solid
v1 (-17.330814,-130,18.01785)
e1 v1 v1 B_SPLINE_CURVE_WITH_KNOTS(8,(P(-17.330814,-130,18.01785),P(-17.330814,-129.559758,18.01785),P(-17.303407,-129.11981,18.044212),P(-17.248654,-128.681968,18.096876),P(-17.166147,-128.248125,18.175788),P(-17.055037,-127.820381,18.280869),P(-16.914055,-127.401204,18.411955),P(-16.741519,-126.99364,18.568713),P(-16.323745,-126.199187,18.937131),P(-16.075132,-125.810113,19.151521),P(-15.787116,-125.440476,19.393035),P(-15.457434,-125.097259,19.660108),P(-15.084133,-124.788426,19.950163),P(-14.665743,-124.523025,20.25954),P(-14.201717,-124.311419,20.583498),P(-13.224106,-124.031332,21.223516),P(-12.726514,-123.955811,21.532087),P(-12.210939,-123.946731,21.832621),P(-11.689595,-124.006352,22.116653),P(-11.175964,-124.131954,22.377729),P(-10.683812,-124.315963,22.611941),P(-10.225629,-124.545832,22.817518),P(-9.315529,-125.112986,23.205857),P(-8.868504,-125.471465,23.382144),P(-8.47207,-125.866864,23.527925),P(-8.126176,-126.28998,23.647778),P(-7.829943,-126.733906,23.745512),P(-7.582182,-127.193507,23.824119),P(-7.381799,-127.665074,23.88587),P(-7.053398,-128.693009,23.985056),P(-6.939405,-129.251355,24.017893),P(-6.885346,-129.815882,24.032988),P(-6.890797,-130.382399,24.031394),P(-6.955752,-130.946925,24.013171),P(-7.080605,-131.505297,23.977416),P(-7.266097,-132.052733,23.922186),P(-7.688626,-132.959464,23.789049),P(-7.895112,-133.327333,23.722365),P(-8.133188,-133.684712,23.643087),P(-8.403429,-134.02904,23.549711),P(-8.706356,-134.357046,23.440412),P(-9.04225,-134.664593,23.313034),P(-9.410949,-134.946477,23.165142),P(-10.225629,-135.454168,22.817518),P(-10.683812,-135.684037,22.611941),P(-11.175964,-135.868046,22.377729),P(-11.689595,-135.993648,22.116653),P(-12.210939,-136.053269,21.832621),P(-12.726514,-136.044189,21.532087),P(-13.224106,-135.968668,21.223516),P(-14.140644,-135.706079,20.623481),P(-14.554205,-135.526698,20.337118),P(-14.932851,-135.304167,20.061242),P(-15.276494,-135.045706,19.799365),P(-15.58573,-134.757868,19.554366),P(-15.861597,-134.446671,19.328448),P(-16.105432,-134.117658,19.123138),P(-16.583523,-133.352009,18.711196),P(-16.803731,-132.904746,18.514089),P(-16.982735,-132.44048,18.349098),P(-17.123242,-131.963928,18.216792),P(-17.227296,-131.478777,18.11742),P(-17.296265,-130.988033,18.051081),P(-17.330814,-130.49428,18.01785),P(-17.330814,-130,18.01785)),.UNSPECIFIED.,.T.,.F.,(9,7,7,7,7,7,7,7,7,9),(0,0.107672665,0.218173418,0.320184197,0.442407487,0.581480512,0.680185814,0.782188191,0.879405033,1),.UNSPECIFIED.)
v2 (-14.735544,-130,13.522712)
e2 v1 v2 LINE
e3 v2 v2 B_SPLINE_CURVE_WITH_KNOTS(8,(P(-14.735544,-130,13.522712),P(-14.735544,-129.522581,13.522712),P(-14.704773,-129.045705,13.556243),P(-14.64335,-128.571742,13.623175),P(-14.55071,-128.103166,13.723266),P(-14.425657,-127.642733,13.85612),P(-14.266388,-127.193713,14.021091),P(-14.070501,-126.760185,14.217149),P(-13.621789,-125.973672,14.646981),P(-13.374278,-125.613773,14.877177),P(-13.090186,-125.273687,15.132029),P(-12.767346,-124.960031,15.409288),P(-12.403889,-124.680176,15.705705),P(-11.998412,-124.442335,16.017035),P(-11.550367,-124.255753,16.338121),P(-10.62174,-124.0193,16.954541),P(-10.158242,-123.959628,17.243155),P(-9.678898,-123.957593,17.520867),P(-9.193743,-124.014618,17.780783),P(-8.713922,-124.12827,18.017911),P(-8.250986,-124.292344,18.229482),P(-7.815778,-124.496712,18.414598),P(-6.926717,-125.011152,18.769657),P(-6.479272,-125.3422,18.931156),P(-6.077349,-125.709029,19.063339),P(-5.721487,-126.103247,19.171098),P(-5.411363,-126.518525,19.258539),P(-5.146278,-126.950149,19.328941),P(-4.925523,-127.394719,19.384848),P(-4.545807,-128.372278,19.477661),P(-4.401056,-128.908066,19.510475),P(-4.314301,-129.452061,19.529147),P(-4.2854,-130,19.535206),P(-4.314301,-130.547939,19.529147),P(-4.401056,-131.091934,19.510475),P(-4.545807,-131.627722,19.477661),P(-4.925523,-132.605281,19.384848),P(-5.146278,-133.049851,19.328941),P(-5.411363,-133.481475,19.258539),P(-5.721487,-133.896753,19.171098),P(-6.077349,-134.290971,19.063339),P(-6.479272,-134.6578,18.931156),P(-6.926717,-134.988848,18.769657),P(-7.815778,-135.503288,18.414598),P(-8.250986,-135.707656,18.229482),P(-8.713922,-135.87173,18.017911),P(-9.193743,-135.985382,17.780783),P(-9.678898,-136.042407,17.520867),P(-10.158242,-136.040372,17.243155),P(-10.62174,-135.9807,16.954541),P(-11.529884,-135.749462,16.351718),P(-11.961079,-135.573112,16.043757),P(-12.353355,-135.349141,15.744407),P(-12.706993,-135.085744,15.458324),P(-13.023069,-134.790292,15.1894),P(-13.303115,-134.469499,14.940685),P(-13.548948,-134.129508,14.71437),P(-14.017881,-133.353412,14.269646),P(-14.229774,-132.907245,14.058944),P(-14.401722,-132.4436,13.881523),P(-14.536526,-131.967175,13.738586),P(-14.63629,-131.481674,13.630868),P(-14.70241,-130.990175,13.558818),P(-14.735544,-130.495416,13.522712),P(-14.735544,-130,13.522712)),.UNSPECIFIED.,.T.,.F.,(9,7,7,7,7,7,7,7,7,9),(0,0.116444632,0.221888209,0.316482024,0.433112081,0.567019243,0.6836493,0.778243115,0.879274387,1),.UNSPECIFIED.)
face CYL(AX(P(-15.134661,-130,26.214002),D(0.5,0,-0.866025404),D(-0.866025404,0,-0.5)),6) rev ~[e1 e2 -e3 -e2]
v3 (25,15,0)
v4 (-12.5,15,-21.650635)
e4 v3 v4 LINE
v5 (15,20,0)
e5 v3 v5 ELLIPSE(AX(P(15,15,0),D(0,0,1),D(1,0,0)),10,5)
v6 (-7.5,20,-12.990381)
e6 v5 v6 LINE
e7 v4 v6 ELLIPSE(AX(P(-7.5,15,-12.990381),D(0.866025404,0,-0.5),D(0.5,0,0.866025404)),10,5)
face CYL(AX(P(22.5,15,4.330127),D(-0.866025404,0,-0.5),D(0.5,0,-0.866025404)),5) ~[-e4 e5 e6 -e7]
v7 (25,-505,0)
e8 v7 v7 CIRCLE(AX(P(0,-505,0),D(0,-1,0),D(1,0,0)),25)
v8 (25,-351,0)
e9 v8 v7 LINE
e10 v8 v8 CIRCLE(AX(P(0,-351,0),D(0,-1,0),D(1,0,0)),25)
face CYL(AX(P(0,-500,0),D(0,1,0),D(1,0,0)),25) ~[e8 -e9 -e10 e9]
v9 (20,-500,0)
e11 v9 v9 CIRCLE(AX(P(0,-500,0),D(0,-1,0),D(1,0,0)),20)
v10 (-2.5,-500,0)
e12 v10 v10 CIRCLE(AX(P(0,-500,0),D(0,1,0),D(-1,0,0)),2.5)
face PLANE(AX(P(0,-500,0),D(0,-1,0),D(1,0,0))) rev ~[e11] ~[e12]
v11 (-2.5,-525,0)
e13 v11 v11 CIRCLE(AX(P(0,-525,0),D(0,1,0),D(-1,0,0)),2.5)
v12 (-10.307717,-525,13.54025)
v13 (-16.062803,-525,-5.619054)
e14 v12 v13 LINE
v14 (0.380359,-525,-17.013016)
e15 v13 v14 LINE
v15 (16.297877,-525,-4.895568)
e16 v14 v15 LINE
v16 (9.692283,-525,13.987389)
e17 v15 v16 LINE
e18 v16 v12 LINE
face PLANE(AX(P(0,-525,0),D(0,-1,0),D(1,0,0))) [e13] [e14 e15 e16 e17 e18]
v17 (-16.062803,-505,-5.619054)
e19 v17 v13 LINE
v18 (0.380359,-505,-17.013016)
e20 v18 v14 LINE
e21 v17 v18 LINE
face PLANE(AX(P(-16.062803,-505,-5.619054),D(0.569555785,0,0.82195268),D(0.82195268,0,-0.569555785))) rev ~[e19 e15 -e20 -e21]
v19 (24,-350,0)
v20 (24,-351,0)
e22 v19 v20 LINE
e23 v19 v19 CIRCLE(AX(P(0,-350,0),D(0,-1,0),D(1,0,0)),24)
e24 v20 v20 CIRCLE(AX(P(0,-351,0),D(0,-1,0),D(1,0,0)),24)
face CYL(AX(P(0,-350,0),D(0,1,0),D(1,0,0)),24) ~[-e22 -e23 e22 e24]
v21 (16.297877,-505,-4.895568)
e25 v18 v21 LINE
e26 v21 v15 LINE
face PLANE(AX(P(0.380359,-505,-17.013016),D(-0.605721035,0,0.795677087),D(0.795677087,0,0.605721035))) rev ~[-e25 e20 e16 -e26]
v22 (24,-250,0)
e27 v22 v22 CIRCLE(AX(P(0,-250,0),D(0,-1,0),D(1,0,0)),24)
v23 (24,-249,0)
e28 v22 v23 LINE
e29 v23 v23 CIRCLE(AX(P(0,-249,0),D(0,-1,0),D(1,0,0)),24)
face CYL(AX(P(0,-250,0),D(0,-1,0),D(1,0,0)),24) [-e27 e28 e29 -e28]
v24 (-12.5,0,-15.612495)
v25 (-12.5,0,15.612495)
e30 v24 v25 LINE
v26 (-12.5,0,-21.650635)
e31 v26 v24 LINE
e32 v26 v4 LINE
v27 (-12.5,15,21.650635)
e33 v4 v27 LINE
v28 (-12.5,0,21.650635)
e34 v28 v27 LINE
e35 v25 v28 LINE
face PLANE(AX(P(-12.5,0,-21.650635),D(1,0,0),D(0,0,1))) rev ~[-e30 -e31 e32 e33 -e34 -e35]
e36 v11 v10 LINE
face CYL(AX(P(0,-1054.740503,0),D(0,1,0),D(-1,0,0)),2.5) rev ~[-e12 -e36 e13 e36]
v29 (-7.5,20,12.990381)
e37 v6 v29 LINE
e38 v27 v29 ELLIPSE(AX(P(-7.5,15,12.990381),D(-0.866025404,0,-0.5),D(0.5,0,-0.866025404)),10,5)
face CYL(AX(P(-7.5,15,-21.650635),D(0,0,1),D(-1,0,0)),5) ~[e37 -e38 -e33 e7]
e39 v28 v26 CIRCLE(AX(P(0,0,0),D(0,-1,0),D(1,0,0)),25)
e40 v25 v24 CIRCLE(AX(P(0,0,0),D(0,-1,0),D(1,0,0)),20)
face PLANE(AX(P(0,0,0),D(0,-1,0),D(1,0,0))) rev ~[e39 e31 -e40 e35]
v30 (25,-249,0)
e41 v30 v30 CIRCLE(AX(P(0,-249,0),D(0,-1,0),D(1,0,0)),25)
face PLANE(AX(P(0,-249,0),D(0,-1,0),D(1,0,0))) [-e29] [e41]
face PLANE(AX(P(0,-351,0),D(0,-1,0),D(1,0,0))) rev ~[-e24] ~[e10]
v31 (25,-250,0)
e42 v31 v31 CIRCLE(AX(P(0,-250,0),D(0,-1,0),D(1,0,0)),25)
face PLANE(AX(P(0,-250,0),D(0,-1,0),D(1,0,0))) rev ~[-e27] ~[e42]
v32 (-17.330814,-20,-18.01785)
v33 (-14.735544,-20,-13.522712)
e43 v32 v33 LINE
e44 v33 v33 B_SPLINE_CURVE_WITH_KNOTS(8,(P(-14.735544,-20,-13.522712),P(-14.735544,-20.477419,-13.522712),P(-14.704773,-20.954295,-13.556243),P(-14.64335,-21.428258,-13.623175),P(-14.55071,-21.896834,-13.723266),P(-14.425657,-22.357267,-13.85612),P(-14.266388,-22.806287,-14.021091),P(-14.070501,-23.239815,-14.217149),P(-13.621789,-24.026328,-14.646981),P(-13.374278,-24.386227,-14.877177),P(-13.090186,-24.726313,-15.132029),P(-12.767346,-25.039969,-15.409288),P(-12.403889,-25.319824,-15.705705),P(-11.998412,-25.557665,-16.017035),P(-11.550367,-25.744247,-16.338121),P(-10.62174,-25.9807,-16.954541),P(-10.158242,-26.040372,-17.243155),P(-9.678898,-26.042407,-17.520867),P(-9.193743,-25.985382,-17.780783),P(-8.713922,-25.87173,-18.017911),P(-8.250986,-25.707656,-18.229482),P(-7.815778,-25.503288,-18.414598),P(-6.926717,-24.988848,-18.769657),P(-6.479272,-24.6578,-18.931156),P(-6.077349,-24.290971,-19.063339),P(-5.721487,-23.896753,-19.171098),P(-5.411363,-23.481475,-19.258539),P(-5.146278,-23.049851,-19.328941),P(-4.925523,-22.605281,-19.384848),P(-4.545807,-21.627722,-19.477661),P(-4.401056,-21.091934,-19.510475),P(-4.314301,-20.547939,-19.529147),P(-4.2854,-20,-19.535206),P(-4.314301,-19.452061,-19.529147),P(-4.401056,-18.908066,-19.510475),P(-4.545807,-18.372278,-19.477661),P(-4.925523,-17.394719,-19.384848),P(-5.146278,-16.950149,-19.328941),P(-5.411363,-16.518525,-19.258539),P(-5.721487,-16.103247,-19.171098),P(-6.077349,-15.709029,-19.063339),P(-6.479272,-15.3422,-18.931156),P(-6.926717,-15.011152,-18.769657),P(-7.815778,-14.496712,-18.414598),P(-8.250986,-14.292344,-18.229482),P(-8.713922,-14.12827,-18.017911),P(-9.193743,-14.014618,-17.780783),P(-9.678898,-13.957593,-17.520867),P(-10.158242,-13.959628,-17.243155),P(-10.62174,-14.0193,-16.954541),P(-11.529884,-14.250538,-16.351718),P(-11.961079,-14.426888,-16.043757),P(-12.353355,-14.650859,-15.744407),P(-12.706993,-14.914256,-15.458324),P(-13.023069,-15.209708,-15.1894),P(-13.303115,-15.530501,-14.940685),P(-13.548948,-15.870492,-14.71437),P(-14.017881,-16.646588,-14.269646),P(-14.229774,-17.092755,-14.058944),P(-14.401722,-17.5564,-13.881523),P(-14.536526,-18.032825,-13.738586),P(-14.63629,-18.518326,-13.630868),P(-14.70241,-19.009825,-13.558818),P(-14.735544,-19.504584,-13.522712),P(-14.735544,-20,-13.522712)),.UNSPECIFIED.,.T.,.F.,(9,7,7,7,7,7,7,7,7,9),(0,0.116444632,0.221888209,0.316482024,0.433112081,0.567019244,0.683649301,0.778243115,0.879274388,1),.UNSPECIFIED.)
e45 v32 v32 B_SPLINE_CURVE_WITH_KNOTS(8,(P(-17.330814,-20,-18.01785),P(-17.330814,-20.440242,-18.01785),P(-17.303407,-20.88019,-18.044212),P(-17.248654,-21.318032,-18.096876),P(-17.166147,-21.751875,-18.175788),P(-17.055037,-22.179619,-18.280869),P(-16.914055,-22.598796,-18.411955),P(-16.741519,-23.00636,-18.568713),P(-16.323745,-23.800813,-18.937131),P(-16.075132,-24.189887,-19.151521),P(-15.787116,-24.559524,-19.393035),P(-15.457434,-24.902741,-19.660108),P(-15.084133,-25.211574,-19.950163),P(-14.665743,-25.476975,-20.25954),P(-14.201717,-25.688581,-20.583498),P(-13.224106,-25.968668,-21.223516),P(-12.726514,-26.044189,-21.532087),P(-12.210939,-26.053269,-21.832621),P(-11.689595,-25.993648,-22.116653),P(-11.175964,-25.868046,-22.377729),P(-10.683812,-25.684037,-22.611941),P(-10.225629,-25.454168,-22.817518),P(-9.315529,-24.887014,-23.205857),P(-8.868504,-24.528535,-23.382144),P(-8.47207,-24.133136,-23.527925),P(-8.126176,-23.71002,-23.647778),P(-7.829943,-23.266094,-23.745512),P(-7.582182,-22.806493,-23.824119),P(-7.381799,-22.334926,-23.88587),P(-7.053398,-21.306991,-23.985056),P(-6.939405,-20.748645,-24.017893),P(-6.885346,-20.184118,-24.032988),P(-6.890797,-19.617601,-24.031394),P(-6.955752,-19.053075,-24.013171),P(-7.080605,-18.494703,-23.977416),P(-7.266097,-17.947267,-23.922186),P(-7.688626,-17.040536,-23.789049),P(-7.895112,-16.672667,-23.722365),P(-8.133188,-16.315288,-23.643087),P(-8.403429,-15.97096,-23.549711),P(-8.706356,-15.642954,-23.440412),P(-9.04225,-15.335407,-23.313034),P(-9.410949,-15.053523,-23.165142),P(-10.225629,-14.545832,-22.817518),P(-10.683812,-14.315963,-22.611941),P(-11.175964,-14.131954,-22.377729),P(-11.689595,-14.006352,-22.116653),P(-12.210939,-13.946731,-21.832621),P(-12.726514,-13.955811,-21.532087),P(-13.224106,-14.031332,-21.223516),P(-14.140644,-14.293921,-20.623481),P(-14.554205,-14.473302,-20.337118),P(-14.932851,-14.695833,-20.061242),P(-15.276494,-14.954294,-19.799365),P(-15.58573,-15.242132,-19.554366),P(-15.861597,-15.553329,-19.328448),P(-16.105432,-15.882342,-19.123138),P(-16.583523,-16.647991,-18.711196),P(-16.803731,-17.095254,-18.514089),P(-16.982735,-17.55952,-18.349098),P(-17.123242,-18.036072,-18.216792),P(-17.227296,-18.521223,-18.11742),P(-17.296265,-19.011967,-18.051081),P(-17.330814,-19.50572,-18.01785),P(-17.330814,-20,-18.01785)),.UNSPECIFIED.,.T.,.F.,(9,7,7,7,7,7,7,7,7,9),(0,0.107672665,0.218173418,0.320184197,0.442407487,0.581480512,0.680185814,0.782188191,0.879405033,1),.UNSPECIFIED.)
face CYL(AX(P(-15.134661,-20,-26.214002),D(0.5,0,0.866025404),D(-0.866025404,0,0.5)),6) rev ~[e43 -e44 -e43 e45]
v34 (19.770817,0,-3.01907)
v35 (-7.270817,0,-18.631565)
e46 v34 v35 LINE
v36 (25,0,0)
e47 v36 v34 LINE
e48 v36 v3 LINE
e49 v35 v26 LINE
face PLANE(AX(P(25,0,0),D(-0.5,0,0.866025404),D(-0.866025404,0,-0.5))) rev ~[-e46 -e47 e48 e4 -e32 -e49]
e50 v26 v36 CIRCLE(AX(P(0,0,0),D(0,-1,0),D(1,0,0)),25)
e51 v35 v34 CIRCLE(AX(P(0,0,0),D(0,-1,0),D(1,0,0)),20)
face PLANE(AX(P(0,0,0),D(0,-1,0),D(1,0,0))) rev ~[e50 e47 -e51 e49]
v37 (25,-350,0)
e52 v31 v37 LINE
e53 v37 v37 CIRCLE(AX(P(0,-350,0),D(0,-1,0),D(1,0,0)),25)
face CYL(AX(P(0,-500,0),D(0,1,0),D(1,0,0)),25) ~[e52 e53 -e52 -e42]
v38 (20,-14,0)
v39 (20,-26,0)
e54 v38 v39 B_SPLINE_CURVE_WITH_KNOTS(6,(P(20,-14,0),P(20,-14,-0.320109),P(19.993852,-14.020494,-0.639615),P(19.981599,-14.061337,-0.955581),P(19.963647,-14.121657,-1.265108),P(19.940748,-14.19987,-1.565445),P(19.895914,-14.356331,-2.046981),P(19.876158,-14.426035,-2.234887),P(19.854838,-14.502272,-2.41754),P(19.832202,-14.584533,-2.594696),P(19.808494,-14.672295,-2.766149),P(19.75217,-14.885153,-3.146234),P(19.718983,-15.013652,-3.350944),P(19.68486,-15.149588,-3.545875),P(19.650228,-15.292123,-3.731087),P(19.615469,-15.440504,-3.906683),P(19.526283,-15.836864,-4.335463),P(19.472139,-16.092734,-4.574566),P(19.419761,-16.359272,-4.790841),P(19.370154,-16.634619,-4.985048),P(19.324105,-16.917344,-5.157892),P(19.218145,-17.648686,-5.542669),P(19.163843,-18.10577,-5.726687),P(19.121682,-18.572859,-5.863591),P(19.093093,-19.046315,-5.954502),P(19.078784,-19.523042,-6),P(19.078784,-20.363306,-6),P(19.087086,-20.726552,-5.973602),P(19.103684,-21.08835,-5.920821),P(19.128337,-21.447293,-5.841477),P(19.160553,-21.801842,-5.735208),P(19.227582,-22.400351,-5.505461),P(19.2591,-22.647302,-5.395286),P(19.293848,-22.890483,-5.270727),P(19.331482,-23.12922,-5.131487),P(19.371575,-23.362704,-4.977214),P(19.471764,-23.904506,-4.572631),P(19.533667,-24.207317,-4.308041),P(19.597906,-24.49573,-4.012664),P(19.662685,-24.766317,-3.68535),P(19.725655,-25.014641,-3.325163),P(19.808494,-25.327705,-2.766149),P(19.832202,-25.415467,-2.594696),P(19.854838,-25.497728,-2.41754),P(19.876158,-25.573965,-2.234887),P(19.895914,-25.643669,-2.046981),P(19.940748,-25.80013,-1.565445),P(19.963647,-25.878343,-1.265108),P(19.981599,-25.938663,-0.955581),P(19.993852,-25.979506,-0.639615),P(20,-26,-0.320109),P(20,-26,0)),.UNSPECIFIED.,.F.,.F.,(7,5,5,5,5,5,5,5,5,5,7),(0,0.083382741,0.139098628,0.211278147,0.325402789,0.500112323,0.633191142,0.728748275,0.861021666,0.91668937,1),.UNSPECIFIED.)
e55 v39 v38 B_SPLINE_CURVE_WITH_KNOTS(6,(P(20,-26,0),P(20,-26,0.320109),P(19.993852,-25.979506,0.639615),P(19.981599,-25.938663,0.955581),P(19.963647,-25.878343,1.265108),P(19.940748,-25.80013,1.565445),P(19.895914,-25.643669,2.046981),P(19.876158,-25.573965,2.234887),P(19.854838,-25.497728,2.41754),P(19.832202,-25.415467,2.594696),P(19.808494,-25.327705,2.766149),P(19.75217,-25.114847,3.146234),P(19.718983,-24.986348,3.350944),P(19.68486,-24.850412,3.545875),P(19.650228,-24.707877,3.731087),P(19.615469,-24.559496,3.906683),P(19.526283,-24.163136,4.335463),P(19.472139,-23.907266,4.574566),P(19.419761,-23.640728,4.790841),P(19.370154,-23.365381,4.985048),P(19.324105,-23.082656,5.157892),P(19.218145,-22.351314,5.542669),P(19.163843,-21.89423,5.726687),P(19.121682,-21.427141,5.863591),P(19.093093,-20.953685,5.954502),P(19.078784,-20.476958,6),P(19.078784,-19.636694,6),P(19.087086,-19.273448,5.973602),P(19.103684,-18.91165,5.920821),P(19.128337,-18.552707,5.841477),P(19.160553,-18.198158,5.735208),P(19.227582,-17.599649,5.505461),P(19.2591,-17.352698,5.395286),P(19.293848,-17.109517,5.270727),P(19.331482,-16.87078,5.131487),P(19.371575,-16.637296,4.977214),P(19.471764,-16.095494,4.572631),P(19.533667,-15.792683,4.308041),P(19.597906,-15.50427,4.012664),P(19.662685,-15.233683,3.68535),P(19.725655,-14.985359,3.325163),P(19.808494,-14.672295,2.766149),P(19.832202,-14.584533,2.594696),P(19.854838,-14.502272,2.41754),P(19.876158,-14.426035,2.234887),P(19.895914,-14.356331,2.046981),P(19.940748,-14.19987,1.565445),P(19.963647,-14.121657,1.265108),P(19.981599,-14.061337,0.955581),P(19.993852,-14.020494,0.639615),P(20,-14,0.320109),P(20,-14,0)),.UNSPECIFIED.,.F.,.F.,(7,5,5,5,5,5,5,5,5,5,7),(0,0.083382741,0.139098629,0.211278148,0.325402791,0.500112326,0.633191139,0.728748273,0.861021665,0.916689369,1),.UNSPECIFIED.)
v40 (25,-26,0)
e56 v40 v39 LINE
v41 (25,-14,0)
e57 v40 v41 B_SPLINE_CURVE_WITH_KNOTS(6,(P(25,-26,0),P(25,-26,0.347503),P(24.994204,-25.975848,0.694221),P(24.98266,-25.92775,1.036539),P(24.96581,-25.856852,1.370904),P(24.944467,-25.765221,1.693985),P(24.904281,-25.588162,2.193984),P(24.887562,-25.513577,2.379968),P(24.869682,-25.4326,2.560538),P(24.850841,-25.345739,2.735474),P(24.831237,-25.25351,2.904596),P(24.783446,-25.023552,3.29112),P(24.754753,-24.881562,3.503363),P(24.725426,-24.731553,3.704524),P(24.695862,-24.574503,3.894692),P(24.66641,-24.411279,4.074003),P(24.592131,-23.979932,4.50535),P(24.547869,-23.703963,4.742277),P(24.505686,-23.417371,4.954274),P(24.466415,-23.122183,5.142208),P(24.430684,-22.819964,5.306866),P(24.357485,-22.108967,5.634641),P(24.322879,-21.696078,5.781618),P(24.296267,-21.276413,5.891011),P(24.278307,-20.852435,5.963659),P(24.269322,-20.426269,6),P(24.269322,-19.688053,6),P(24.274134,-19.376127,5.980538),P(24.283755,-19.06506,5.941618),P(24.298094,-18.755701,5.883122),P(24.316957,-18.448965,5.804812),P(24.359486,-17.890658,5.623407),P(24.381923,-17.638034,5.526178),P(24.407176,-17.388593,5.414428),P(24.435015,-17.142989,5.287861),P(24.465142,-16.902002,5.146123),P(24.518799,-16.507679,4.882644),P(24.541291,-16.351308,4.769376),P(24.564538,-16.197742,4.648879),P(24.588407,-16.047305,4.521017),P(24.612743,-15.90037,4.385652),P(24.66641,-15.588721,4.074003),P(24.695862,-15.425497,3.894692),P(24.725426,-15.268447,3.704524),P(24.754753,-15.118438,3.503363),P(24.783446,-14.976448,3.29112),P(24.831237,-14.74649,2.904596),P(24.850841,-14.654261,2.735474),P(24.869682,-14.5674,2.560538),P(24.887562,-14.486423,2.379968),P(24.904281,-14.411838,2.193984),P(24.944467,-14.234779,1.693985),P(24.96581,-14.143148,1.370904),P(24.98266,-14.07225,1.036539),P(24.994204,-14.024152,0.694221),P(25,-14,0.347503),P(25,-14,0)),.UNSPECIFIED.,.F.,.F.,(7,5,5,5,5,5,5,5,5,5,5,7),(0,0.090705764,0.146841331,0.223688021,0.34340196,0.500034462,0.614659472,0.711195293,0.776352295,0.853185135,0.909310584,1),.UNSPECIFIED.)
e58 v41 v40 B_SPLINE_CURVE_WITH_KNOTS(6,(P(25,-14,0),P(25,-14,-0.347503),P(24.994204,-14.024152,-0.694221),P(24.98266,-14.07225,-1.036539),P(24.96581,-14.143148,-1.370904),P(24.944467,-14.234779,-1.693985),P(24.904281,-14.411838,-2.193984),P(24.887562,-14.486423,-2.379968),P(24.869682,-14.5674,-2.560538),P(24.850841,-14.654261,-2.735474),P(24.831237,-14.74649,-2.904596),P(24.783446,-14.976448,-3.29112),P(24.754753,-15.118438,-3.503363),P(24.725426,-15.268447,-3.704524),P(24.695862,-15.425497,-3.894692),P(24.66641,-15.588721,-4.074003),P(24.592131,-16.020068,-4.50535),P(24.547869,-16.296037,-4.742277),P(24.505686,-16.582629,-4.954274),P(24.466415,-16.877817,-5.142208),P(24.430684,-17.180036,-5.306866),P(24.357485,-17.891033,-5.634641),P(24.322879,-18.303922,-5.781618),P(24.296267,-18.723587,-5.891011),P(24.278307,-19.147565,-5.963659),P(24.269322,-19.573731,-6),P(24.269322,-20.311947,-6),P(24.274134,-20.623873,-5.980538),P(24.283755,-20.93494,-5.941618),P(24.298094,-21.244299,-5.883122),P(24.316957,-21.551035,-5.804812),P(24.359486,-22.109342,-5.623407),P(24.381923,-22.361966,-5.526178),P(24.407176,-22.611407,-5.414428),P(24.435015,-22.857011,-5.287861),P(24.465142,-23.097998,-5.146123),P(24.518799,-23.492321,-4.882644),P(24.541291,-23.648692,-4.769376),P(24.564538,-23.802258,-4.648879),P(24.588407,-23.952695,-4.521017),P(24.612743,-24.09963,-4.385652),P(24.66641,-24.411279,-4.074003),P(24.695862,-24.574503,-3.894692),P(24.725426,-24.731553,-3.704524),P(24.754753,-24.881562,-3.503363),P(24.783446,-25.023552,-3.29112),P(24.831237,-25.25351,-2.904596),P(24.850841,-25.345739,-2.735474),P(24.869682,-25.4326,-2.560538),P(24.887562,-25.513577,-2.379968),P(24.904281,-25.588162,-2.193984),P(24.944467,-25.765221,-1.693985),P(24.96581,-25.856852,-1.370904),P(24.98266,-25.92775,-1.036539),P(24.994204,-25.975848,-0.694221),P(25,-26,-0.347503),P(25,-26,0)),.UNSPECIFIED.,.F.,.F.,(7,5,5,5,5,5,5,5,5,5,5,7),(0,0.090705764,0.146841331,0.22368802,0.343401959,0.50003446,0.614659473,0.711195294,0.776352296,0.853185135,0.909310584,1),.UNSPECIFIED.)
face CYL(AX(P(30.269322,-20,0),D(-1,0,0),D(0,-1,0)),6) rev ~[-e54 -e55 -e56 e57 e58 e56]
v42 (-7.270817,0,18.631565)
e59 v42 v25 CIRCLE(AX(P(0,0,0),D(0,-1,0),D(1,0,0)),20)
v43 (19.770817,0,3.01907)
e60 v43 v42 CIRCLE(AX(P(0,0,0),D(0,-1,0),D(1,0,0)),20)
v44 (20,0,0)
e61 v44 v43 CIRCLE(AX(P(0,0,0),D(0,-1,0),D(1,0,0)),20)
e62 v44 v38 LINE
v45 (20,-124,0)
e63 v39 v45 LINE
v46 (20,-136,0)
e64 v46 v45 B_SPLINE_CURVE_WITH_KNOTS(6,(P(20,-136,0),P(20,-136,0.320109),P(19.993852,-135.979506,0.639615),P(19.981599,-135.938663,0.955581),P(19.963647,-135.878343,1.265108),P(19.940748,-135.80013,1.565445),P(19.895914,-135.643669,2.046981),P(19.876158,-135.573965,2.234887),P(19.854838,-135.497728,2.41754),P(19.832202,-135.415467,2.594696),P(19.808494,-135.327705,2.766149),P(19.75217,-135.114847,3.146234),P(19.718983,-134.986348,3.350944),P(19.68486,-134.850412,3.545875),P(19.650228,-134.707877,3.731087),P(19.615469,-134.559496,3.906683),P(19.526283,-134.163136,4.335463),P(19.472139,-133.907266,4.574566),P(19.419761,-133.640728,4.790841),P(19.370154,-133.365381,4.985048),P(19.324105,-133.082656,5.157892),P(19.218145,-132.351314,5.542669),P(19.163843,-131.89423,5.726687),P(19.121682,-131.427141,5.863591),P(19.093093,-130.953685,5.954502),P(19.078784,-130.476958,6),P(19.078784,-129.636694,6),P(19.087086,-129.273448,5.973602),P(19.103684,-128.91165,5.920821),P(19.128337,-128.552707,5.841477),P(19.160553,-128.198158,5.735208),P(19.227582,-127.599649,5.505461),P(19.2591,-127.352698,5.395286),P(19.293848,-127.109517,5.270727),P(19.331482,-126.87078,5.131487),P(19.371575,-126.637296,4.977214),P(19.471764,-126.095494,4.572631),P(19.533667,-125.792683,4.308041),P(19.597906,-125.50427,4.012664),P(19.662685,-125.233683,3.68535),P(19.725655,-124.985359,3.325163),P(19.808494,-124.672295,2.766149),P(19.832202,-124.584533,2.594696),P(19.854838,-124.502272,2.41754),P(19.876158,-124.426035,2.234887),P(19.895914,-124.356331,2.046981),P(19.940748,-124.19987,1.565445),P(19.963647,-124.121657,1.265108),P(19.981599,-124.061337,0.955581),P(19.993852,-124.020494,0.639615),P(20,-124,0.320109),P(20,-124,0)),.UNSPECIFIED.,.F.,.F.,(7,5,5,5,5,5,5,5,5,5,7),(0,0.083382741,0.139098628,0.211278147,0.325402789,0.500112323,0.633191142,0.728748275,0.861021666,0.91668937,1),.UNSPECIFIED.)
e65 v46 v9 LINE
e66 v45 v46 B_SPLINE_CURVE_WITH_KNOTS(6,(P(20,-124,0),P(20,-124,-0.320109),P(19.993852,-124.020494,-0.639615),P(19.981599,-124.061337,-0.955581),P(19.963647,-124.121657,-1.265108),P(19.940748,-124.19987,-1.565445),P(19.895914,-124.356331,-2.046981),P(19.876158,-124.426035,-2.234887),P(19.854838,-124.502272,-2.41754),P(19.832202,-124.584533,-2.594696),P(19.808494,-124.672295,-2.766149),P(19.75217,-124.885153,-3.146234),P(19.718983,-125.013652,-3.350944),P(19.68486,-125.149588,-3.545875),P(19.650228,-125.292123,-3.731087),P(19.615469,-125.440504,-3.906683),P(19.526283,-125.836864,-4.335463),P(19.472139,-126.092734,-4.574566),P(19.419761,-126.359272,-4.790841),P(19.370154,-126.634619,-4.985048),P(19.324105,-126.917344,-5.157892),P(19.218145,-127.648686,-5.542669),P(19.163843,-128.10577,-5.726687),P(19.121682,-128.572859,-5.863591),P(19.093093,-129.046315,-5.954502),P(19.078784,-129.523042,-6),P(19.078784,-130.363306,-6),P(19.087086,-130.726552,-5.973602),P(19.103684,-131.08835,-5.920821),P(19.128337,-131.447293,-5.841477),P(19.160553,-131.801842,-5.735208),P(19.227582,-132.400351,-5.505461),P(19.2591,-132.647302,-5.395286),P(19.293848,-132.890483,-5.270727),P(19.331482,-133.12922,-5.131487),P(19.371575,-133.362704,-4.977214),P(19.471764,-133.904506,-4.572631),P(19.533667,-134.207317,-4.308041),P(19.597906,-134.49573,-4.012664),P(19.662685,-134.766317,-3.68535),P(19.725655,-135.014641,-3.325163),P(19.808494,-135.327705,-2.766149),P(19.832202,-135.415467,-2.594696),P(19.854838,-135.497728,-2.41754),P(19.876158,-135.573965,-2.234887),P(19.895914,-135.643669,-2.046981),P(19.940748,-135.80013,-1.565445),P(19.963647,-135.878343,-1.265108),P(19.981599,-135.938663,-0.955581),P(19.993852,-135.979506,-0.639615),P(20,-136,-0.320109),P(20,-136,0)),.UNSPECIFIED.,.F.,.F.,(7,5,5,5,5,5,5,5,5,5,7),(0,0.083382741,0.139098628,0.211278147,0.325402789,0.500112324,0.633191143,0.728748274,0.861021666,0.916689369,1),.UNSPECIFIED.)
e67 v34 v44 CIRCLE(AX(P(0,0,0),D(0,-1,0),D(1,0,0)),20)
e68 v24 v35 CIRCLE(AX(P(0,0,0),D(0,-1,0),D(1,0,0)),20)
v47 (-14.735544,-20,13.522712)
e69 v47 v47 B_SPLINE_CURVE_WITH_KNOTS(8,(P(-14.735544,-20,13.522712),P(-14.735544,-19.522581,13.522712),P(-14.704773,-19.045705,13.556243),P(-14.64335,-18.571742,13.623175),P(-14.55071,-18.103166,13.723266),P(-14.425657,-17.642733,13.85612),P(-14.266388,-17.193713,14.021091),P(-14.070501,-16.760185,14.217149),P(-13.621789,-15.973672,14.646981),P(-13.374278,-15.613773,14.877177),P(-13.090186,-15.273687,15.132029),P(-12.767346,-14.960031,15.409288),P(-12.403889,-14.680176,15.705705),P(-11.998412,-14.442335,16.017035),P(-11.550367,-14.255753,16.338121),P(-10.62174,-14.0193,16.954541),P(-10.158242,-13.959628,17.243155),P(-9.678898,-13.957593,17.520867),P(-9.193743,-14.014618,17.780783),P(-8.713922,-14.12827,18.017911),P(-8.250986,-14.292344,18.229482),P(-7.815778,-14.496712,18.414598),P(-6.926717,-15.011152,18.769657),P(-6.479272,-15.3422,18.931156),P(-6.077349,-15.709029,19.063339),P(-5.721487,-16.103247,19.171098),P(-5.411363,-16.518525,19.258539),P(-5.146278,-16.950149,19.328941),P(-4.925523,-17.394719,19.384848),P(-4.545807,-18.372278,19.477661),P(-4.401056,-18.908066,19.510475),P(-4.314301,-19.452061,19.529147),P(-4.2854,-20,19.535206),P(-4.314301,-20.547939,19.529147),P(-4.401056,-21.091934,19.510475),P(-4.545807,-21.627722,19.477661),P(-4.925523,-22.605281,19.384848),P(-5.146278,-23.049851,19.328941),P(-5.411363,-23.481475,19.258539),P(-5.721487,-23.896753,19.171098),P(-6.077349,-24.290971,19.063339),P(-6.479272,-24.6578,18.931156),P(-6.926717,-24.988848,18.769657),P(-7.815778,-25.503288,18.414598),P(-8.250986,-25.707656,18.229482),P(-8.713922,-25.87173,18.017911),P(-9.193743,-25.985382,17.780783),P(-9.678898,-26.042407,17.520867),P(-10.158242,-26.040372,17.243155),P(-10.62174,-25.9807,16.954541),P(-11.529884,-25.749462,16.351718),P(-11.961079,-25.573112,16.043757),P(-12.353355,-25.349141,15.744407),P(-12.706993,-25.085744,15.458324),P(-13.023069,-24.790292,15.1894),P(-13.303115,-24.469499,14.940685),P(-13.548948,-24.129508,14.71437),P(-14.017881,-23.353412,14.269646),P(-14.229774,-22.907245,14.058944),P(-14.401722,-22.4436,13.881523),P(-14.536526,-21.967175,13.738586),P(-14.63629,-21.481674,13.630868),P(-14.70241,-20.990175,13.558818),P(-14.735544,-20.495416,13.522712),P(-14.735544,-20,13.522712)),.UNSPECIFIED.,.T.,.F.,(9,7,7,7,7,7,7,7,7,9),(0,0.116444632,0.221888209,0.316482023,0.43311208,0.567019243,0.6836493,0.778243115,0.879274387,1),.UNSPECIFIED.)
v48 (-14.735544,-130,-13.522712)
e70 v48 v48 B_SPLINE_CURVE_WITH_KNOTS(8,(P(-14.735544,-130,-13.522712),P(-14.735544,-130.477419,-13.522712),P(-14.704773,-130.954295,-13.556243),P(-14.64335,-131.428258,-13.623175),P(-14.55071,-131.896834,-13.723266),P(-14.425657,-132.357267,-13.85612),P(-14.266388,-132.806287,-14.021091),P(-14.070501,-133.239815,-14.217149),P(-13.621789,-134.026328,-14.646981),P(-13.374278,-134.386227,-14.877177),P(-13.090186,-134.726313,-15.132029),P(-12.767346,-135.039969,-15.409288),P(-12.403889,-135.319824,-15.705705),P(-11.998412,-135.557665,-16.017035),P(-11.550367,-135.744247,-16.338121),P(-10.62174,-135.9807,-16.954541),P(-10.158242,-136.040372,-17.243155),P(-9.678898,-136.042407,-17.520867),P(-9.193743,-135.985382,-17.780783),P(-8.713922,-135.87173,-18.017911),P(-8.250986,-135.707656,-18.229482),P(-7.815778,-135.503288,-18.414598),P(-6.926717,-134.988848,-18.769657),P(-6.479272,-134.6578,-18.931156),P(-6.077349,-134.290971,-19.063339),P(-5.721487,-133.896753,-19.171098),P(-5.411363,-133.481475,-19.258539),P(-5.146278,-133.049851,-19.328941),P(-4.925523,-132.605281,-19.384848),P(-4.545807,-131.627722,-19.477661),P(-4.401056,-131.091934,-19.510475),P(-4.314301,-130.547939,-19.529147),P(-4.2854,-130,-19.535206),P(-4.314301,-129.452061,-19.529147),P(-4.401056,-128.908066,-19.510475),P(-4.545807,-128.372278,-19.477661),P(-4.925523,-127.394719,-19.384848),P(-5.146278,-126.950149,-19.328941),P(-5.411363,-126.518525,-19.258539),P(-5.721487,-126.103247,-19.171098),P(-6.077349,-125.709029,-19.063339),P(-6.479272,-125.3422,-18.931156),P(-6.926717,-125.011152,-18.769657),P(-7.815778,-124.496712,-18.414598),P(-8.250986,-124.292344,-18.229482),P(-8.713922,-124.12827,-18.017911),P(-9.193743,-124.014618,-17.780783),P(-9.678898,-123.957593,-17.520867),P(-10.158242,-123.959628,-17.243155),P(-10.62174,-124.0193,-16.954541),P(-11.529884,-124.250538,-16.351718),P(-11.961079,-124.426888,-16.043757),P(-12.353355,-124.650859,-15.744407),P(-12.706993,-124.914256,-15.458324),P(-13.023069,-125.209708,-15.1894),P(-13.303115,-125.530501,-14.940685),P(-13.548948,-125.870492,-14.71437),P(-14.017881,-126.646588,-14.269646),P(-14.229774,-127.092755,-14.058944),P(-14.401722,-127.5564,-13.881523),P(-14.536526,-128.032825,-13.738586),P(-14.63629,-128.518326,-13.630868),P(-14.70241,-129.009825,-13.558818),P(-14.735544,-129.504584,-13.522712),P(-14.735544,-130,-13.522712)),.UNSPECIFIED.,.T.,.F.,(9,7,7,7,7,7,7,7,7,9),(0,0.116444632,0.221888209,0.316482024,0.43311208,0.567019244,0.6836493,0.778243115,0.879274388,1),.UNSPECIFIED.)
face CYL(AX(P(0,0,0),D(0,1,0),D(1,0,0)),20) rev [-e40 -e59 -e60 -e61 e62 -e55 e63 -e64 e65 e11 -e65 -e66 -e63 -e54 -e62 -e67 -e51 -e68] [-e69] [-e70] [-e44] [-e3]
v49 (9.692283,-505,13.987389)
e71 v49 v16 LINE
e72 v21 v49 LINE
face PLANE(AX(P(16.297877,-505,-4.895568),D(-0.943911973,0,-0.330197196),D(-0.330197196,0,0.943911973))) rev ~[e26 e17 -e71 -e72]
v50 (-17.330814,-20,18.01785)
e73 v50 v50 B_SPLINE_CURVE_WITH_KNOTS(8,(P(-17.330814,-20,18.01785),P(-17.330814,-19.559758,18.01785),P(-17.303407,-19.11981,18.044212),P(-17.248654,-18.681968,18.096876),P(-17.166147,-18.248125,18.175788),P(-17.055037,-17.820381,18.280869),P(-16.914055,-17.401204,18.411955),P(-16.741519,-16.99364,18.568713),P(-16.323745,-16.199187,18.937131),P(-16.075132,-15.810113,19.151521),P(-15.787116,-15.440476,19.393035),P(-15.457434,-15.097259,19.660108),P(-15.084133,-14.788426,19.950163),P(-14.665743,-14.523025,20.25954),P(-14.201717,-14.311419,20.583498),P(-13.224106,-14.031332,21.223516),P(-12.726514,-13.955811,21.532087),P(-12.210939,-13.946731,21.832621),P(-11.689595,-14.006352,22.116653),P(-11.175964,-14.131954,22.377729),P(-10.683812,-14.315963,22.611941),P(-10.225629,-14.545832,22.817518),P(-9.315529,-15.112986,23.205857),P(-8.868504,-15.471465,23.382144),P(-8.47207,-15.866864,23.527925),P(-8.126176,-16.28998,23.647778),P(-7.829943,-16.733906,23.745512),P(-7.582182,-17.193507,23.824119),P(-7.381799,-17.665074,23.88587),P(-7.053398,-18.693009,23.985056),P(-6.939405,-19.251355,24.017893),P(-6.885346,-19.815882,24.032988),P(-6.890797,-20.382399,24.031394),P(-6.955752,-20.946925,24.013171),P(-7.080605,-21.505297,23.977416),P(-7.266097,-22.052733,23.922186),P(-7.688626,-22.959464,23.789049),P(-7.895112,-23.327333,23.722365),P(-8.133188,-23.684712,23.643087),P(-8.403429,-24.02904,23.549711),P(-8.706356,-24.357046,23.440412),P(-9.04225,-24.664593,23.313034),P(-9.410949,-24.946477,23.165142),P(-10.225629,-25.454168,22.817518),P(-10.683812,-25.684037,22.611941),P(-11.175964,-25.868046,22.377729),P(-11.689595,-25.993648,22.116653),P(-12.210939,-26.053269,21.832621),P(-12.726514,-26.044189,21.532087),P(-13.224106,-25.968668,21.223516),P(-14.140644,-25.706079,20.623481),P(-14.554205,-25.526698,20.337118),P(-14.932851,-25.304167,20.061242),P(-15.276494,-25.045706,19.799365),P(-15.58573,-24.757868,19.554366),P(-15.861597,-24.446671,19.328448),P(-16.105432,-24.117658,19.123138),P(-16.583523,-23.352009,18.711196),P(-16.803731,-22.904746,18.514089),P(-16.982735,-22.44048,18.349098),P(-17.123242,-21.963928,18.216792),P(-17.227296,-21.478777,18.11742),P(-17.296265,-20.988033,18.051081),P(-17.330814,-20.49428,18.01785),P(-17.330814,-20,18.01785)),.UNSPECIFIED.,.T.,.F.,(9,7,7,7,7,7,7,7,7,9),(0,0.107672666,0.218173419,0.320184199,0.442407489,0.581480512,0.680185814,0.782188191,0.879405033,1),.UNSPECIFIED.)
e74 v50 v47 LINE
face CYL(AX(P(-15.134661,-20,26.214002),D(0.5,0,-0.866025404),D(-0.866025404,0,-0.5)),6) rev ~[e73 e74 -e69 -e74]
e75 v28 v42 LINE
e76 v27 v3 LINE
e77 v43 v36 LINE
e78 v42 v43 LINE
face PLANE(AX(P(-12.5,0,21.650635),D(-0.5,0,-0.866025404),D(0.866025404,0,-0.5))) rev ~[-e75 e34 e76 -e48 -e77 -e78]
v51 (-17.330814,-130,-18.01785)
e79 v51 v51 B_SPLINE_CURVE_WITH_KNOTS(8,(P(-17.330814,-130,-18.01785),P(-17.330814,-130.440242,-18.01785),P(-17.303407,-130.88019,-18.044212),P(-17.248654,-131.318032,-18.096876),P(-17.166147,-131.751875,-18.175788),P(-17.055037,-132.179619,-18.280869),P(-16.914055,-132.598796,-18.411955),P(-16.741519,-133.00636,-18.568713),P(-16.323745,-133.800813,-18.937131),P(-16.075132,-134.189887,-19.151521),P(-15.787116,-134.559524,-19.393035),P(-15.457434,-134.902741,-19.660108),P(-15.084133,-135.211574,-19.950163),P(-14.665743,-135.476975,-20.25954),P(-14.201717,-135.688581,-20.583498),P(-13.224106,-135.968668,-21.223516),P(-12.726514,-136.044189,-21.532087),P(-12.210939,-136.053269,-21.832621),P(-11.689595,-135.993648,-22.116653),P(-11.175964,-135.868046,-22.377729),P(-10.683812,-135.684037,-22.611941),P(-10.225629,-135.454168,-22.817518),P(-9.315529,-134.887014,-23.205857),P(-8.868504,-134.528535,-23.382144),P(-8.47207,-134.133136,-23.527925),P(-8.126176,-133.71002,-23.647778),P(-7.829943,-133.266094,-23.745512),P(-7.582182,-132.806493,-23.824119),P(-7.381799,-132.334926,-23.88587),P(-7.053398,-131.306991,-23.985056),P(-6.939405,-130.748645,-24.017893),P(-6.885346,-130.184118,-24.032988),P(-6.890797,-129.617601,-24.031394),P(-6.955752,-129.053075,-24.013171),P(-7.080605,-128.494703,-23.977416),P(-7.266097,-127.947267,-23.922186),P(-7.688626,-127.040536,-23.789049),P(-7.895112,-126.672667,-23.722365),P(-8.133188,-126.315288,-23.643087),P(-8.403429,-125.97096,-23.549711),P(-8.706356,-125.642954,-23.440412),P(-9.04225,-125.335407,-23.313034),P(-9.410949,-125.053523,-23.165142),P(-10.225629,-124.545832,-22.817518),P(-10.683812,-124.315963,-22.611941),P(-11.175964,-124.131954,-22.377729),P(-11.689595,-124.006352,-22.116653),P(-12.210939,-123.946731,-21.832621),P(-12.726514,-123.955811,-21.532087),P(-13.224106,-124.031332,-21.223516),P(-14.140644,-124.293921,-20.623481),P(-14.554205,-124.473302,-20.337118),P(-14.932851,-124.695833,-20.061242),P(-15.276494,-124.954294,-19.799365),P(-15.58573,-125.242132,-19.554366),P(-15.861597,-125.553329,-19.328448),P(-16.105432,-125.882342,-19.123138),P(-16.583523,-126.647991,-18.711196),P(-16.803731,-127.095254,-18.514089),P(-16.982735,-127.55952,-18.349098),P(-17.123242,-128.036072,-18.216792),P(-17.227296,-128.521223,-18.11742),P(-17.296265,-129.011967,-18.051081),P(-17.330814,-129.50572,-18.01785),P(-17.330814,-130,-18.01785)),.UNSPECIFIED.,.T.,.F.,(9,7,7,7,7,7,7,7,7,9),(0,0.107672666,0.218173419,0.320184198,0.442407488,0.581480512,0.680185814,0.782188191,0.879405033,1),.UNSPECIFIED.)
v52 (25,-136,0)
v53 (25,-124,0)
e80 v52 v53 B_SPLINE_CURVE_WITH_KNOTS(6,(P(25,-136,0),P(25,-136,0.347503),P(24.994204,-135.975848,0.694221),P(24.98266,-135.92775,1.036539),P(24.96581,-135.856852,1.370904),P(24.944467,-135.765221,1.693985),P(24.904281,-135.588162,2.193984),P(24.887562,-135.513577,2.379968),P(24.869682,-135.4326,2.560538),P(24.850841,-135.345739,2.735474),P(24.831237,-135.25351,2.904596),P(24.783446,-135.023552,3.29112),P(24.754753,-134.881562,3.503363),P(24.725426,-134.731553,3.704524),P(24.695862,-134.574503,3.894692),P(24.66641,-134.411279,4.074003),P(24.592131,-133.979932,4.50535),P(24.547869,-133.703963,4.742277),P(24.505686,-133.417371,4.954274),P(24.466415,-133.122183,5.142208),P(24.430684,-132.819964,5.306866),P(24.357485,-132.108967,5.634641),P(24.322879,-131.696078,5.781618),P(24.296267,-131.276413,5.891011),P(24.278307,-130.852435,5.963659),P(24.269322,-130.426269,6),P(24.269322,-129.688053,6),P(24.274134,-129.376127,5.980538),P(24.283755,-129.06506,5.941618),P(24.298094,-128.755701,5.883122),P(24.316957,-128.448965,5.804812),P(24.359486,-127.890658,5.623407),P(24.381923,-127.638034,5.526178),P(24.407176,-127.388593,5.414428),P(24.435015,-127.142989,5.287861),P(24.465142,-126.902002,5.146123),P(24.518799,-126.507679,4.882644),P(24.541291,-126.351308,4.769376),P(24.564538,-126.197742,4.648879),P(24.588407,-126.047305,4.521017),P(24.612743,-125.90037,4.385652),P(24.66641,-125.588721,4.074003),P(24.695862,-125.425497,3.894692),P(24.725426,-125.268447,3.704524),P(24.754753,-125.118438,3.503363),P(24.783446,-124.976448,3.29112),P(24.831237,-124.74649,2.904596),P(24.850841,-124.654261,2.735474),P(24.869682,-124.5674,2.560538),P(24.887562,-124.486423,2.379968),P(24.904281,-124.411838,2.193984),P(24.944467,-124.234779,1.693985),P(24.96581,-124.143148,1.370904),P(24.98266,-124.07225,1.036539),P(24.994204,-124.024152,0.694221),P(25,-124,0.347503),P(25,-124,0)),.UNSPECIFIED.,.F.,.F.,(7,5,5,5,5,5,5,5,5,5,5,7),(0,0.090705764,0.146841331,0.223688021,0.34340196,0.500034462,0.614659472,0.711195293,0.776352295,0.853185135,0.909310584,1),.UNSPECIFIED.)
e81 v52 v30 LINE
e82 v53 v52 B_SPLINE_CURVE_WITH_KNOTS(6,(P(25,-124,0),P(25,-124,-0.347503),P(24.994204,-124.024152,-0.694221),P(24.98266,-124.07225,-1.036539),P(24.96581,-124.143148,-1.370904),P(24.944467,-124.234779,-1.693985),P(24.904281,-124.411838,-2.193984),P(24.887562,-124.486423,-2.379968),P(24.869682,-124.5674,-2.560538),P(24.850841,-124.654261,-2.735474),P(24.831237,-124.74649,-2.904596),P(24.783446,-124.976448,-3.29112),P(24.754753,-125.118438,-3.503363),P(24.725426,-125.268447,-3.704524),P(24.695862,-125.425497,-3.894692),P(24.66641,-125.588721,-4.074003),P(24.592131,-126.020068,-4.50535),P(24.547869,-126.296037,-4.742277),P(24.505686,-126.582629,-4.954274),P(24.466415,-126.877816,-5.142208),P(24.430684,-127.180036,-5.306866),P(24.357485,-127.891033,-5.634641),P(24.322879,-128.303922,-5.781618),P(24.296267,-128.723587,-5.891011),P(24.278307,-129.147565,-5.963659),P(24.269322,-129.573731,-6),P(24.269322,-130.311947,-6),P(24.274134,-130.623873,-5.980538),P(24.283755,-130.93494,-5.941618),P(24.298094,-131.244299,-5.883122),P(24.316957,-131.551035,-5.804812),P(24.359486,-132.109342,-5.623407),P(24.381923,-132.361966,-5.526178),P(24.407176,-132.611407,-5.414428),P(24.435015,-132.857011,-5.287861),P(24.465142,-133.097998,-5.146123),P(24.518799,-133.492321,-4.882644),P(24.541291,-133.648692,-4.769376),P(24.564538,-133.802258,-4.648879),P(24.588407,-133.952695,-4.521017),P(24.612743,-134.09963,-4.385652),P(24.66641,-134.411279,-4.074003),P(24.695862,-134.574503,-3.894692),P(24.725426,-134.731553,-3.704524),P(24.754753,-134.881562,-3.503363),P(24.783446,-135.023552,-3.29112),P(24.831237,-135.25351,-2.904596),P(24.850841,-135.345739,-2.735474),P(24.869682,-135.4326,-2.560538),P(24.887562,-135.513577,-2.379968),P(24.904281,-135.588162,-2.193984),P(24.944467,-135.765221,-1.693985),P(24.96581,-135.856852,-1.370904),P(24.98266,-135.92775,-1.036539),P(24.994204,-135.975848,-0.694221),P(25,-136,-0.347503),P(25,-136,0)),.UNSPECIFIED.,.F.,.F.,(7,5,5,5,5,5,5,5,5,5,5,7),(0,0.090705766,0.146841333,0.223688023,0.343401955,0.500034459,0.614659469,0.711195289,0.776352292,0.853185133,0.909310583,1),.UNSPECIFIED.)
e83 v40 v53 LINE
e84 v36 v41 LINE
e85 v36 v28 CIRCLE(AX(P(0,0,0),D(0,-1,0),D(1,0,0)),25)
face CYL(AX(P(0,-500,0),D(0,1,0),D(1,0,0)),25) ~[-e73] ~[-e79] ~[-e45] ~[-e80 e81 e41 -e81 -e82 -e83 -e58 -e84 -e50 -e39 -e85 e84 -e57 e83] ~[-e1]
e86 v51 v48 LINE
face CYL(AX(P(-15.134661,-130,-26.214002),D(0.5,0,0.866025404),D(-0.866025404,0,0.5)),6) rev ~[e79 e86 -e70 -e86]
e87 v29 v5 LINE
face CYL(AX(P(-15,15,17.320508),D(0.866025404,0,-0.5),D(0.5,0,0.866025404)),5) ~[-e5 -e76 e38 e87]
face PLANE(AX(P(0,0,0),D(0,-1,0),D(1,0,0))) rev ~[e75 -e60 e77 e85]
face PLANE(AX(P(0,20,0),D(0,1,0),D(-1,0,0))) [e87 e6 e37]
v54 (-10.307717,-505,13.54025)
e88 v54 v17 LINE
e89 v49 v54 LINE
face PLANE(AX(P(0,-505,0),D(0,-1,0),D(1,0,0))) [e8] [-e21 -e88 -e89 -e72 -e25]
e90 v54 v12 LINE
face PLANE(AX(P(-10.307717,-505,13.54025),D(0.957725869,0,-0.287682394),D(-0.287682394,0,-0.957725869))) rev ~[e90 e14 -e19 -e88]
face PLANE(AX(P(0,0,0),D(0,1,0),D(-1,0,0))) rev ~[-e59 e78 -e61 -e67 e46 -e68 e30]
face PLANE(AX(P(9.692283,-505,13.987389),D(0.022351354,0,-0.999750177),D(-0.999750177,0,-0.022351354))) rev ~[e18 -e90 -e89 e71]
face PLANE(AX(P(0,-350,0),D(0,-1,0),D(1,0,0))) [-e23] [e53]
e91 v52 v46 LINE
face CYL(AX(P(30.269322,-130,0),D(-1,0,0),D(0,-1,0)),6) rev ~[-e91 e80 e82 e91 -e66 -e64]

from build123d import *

# Parameters (mm, degrees)
F0_R      = 25
F0_R_2    = 20
F1_DEPTH  = 500
F2_R      = 25
F3_DEPTH  = 5
F5_DEPTH  = 20
F7_D      = 5
F10_D     = 12
F10_DEPTH = 6
F10_START = 0.7306779
F10_TIP   = 3.6051637142
F12_DEPTH = 20
F17_D     = 12
F17_DEPTH = 6
F17_START = 0.7306779
F17_TIP   = 3.6051637142
F19_D     = 12
F19_DEPTH = 6
F19_START = 0.7306779
F19_TIP   = 3.6051637142
F20_R     = 5
F22_R     = 25
F22_R_2   = 24
F23_DEPTH = 1
F25_R     = 25
F25_R_2   = 24
F26_DEPTH = 1


with BuildPart() as f1:
    # F0 (on Front) → F1 (new body)
    with BuildSketch(Plane.XZ):
        Circle(F0_R)
        Circle(F0_R_2, mode=Mode.SUBTRACT)
    extrude(amount=F1_DEPTH)

    # F2 (on face) → F3 (join)
    with BuildSketch(Plane.XZ.offset(500)):
        Circle(F2_R)
    extrude(amount=F3_DEPTH)

    # F4 (on face) → F5 (join)
    with BuildSketch(Plane.XZ.offset(505)):
        Polygon((-16.0628025015, -5.6190539991), (0.380358971, -17.013016167), (16.2978772735, -4.8955682433), (9.6922831285, 13.9873885984), (-10.3077168715, 13.540249811), align=None)
    extrude(amount=F5_DEPTH)

    # F7 (through all)
    with Locations(Plane.XZ.offset(525)):
        with Locations((0, 0)):
            Hole(F7_D / 2)

    # F10
    # its depths count from where the whole tool has entered the part; down to there all is cleared
    with Locations(Plane.YZ.offset(25).offset(-F10_START)):
        with Locations((-20, 0), (-130, 0)):
            Hole(F10_D / 2, depth=F10_DEPTH)
            with Locations((0, 0, -(F10_DEPTH + F10_TIP / 2))):  # 118° drill point
                Cone(0, F10_D / 2, F10_TIP, mode=Mode.SUBTRACT)

    # F11 (on face) → F12 (join)
    with BuildSketch(Plane(origin=(0, 0, 0), x_dir=(-1, 0, 0), z_dir=(0, 1, 0))):
        Polygon((12.5, -21.6506350946), (12.5, 21.6506350946), (-25, 0), align=None)
    extrude(amount=F12_DEPTH)

    # F17
    # its depths count from where the whole tool has entered the part; down to there all is cleared
    with Locations(Plane(origin=(-12.5, 0, -21.6506350946), x_dir=(0.8660254038, 0, -0.5), z_dir=(-0.5, 0, -0.8660254038)).offset(-F17_START)):
        with Locations((0, 20), (0, 130)):
            Hole(F17_D / 2, depth=F17_DEPTH)
            with Locations((0, 0, -(F17_DEPTH + F17_TIP / 2))):  # 118° drill point
                Cone(0, F17_D / 2, F17_TIP, mode=Mode.SUBTRACT)

    # F19
    # its depths count from where the whole tool has entered the part; down to there all is cleared
    with Locations(Plane(origin=(-12.5, 0, 21.6506350946), x_dir=(0.8660254038, 0, 0.5), z_dir=(-0.5, 0, 0.8660254038)).offset(-F19_START)):
        with Locations((0, -20), (0, -130)):
            Hole(F19_D / 2, depth=F19_DEPTH)
            with Locations((0, 0, -(F19_DEPTH + F19_TIP / 2))):  # 118° drill point
                Cone(0, F19_D / 2, F19_TIP, mode=Mode.SUBTRACT)

    # F20
    f20_edges = [f1.edges().sort_by_distance(p)[0] for p in [
        (6.25, 20, 10.825318),
        (-12.5, 20, 0),
        (6.25, 20, -10.825318),
    ]]
    fillet(f20_edges, radius=F20_R)

    # F22 (on offset) → F23 (cut)
    with BuildSketch(Plane.XZ.offset(250)):
        Circle(F22_R)
        Circle(F22_R_2, mode=Mode.SUBTRACT)
    extrude(amount=-F23_DEPTH, mode=Mode.SUBTRACT)

    # F25 (on offset) → F26 (cut)
    with BuildSketch(Plane.XZ.offset(350)):
        Circle(F25_R)
        Circle(F25_R_2, mode=Mode.SUBTRACT)
    extrude(amount=F26_DEPTH, mode=Mode.SUBTRACT)


solid = f1.part
